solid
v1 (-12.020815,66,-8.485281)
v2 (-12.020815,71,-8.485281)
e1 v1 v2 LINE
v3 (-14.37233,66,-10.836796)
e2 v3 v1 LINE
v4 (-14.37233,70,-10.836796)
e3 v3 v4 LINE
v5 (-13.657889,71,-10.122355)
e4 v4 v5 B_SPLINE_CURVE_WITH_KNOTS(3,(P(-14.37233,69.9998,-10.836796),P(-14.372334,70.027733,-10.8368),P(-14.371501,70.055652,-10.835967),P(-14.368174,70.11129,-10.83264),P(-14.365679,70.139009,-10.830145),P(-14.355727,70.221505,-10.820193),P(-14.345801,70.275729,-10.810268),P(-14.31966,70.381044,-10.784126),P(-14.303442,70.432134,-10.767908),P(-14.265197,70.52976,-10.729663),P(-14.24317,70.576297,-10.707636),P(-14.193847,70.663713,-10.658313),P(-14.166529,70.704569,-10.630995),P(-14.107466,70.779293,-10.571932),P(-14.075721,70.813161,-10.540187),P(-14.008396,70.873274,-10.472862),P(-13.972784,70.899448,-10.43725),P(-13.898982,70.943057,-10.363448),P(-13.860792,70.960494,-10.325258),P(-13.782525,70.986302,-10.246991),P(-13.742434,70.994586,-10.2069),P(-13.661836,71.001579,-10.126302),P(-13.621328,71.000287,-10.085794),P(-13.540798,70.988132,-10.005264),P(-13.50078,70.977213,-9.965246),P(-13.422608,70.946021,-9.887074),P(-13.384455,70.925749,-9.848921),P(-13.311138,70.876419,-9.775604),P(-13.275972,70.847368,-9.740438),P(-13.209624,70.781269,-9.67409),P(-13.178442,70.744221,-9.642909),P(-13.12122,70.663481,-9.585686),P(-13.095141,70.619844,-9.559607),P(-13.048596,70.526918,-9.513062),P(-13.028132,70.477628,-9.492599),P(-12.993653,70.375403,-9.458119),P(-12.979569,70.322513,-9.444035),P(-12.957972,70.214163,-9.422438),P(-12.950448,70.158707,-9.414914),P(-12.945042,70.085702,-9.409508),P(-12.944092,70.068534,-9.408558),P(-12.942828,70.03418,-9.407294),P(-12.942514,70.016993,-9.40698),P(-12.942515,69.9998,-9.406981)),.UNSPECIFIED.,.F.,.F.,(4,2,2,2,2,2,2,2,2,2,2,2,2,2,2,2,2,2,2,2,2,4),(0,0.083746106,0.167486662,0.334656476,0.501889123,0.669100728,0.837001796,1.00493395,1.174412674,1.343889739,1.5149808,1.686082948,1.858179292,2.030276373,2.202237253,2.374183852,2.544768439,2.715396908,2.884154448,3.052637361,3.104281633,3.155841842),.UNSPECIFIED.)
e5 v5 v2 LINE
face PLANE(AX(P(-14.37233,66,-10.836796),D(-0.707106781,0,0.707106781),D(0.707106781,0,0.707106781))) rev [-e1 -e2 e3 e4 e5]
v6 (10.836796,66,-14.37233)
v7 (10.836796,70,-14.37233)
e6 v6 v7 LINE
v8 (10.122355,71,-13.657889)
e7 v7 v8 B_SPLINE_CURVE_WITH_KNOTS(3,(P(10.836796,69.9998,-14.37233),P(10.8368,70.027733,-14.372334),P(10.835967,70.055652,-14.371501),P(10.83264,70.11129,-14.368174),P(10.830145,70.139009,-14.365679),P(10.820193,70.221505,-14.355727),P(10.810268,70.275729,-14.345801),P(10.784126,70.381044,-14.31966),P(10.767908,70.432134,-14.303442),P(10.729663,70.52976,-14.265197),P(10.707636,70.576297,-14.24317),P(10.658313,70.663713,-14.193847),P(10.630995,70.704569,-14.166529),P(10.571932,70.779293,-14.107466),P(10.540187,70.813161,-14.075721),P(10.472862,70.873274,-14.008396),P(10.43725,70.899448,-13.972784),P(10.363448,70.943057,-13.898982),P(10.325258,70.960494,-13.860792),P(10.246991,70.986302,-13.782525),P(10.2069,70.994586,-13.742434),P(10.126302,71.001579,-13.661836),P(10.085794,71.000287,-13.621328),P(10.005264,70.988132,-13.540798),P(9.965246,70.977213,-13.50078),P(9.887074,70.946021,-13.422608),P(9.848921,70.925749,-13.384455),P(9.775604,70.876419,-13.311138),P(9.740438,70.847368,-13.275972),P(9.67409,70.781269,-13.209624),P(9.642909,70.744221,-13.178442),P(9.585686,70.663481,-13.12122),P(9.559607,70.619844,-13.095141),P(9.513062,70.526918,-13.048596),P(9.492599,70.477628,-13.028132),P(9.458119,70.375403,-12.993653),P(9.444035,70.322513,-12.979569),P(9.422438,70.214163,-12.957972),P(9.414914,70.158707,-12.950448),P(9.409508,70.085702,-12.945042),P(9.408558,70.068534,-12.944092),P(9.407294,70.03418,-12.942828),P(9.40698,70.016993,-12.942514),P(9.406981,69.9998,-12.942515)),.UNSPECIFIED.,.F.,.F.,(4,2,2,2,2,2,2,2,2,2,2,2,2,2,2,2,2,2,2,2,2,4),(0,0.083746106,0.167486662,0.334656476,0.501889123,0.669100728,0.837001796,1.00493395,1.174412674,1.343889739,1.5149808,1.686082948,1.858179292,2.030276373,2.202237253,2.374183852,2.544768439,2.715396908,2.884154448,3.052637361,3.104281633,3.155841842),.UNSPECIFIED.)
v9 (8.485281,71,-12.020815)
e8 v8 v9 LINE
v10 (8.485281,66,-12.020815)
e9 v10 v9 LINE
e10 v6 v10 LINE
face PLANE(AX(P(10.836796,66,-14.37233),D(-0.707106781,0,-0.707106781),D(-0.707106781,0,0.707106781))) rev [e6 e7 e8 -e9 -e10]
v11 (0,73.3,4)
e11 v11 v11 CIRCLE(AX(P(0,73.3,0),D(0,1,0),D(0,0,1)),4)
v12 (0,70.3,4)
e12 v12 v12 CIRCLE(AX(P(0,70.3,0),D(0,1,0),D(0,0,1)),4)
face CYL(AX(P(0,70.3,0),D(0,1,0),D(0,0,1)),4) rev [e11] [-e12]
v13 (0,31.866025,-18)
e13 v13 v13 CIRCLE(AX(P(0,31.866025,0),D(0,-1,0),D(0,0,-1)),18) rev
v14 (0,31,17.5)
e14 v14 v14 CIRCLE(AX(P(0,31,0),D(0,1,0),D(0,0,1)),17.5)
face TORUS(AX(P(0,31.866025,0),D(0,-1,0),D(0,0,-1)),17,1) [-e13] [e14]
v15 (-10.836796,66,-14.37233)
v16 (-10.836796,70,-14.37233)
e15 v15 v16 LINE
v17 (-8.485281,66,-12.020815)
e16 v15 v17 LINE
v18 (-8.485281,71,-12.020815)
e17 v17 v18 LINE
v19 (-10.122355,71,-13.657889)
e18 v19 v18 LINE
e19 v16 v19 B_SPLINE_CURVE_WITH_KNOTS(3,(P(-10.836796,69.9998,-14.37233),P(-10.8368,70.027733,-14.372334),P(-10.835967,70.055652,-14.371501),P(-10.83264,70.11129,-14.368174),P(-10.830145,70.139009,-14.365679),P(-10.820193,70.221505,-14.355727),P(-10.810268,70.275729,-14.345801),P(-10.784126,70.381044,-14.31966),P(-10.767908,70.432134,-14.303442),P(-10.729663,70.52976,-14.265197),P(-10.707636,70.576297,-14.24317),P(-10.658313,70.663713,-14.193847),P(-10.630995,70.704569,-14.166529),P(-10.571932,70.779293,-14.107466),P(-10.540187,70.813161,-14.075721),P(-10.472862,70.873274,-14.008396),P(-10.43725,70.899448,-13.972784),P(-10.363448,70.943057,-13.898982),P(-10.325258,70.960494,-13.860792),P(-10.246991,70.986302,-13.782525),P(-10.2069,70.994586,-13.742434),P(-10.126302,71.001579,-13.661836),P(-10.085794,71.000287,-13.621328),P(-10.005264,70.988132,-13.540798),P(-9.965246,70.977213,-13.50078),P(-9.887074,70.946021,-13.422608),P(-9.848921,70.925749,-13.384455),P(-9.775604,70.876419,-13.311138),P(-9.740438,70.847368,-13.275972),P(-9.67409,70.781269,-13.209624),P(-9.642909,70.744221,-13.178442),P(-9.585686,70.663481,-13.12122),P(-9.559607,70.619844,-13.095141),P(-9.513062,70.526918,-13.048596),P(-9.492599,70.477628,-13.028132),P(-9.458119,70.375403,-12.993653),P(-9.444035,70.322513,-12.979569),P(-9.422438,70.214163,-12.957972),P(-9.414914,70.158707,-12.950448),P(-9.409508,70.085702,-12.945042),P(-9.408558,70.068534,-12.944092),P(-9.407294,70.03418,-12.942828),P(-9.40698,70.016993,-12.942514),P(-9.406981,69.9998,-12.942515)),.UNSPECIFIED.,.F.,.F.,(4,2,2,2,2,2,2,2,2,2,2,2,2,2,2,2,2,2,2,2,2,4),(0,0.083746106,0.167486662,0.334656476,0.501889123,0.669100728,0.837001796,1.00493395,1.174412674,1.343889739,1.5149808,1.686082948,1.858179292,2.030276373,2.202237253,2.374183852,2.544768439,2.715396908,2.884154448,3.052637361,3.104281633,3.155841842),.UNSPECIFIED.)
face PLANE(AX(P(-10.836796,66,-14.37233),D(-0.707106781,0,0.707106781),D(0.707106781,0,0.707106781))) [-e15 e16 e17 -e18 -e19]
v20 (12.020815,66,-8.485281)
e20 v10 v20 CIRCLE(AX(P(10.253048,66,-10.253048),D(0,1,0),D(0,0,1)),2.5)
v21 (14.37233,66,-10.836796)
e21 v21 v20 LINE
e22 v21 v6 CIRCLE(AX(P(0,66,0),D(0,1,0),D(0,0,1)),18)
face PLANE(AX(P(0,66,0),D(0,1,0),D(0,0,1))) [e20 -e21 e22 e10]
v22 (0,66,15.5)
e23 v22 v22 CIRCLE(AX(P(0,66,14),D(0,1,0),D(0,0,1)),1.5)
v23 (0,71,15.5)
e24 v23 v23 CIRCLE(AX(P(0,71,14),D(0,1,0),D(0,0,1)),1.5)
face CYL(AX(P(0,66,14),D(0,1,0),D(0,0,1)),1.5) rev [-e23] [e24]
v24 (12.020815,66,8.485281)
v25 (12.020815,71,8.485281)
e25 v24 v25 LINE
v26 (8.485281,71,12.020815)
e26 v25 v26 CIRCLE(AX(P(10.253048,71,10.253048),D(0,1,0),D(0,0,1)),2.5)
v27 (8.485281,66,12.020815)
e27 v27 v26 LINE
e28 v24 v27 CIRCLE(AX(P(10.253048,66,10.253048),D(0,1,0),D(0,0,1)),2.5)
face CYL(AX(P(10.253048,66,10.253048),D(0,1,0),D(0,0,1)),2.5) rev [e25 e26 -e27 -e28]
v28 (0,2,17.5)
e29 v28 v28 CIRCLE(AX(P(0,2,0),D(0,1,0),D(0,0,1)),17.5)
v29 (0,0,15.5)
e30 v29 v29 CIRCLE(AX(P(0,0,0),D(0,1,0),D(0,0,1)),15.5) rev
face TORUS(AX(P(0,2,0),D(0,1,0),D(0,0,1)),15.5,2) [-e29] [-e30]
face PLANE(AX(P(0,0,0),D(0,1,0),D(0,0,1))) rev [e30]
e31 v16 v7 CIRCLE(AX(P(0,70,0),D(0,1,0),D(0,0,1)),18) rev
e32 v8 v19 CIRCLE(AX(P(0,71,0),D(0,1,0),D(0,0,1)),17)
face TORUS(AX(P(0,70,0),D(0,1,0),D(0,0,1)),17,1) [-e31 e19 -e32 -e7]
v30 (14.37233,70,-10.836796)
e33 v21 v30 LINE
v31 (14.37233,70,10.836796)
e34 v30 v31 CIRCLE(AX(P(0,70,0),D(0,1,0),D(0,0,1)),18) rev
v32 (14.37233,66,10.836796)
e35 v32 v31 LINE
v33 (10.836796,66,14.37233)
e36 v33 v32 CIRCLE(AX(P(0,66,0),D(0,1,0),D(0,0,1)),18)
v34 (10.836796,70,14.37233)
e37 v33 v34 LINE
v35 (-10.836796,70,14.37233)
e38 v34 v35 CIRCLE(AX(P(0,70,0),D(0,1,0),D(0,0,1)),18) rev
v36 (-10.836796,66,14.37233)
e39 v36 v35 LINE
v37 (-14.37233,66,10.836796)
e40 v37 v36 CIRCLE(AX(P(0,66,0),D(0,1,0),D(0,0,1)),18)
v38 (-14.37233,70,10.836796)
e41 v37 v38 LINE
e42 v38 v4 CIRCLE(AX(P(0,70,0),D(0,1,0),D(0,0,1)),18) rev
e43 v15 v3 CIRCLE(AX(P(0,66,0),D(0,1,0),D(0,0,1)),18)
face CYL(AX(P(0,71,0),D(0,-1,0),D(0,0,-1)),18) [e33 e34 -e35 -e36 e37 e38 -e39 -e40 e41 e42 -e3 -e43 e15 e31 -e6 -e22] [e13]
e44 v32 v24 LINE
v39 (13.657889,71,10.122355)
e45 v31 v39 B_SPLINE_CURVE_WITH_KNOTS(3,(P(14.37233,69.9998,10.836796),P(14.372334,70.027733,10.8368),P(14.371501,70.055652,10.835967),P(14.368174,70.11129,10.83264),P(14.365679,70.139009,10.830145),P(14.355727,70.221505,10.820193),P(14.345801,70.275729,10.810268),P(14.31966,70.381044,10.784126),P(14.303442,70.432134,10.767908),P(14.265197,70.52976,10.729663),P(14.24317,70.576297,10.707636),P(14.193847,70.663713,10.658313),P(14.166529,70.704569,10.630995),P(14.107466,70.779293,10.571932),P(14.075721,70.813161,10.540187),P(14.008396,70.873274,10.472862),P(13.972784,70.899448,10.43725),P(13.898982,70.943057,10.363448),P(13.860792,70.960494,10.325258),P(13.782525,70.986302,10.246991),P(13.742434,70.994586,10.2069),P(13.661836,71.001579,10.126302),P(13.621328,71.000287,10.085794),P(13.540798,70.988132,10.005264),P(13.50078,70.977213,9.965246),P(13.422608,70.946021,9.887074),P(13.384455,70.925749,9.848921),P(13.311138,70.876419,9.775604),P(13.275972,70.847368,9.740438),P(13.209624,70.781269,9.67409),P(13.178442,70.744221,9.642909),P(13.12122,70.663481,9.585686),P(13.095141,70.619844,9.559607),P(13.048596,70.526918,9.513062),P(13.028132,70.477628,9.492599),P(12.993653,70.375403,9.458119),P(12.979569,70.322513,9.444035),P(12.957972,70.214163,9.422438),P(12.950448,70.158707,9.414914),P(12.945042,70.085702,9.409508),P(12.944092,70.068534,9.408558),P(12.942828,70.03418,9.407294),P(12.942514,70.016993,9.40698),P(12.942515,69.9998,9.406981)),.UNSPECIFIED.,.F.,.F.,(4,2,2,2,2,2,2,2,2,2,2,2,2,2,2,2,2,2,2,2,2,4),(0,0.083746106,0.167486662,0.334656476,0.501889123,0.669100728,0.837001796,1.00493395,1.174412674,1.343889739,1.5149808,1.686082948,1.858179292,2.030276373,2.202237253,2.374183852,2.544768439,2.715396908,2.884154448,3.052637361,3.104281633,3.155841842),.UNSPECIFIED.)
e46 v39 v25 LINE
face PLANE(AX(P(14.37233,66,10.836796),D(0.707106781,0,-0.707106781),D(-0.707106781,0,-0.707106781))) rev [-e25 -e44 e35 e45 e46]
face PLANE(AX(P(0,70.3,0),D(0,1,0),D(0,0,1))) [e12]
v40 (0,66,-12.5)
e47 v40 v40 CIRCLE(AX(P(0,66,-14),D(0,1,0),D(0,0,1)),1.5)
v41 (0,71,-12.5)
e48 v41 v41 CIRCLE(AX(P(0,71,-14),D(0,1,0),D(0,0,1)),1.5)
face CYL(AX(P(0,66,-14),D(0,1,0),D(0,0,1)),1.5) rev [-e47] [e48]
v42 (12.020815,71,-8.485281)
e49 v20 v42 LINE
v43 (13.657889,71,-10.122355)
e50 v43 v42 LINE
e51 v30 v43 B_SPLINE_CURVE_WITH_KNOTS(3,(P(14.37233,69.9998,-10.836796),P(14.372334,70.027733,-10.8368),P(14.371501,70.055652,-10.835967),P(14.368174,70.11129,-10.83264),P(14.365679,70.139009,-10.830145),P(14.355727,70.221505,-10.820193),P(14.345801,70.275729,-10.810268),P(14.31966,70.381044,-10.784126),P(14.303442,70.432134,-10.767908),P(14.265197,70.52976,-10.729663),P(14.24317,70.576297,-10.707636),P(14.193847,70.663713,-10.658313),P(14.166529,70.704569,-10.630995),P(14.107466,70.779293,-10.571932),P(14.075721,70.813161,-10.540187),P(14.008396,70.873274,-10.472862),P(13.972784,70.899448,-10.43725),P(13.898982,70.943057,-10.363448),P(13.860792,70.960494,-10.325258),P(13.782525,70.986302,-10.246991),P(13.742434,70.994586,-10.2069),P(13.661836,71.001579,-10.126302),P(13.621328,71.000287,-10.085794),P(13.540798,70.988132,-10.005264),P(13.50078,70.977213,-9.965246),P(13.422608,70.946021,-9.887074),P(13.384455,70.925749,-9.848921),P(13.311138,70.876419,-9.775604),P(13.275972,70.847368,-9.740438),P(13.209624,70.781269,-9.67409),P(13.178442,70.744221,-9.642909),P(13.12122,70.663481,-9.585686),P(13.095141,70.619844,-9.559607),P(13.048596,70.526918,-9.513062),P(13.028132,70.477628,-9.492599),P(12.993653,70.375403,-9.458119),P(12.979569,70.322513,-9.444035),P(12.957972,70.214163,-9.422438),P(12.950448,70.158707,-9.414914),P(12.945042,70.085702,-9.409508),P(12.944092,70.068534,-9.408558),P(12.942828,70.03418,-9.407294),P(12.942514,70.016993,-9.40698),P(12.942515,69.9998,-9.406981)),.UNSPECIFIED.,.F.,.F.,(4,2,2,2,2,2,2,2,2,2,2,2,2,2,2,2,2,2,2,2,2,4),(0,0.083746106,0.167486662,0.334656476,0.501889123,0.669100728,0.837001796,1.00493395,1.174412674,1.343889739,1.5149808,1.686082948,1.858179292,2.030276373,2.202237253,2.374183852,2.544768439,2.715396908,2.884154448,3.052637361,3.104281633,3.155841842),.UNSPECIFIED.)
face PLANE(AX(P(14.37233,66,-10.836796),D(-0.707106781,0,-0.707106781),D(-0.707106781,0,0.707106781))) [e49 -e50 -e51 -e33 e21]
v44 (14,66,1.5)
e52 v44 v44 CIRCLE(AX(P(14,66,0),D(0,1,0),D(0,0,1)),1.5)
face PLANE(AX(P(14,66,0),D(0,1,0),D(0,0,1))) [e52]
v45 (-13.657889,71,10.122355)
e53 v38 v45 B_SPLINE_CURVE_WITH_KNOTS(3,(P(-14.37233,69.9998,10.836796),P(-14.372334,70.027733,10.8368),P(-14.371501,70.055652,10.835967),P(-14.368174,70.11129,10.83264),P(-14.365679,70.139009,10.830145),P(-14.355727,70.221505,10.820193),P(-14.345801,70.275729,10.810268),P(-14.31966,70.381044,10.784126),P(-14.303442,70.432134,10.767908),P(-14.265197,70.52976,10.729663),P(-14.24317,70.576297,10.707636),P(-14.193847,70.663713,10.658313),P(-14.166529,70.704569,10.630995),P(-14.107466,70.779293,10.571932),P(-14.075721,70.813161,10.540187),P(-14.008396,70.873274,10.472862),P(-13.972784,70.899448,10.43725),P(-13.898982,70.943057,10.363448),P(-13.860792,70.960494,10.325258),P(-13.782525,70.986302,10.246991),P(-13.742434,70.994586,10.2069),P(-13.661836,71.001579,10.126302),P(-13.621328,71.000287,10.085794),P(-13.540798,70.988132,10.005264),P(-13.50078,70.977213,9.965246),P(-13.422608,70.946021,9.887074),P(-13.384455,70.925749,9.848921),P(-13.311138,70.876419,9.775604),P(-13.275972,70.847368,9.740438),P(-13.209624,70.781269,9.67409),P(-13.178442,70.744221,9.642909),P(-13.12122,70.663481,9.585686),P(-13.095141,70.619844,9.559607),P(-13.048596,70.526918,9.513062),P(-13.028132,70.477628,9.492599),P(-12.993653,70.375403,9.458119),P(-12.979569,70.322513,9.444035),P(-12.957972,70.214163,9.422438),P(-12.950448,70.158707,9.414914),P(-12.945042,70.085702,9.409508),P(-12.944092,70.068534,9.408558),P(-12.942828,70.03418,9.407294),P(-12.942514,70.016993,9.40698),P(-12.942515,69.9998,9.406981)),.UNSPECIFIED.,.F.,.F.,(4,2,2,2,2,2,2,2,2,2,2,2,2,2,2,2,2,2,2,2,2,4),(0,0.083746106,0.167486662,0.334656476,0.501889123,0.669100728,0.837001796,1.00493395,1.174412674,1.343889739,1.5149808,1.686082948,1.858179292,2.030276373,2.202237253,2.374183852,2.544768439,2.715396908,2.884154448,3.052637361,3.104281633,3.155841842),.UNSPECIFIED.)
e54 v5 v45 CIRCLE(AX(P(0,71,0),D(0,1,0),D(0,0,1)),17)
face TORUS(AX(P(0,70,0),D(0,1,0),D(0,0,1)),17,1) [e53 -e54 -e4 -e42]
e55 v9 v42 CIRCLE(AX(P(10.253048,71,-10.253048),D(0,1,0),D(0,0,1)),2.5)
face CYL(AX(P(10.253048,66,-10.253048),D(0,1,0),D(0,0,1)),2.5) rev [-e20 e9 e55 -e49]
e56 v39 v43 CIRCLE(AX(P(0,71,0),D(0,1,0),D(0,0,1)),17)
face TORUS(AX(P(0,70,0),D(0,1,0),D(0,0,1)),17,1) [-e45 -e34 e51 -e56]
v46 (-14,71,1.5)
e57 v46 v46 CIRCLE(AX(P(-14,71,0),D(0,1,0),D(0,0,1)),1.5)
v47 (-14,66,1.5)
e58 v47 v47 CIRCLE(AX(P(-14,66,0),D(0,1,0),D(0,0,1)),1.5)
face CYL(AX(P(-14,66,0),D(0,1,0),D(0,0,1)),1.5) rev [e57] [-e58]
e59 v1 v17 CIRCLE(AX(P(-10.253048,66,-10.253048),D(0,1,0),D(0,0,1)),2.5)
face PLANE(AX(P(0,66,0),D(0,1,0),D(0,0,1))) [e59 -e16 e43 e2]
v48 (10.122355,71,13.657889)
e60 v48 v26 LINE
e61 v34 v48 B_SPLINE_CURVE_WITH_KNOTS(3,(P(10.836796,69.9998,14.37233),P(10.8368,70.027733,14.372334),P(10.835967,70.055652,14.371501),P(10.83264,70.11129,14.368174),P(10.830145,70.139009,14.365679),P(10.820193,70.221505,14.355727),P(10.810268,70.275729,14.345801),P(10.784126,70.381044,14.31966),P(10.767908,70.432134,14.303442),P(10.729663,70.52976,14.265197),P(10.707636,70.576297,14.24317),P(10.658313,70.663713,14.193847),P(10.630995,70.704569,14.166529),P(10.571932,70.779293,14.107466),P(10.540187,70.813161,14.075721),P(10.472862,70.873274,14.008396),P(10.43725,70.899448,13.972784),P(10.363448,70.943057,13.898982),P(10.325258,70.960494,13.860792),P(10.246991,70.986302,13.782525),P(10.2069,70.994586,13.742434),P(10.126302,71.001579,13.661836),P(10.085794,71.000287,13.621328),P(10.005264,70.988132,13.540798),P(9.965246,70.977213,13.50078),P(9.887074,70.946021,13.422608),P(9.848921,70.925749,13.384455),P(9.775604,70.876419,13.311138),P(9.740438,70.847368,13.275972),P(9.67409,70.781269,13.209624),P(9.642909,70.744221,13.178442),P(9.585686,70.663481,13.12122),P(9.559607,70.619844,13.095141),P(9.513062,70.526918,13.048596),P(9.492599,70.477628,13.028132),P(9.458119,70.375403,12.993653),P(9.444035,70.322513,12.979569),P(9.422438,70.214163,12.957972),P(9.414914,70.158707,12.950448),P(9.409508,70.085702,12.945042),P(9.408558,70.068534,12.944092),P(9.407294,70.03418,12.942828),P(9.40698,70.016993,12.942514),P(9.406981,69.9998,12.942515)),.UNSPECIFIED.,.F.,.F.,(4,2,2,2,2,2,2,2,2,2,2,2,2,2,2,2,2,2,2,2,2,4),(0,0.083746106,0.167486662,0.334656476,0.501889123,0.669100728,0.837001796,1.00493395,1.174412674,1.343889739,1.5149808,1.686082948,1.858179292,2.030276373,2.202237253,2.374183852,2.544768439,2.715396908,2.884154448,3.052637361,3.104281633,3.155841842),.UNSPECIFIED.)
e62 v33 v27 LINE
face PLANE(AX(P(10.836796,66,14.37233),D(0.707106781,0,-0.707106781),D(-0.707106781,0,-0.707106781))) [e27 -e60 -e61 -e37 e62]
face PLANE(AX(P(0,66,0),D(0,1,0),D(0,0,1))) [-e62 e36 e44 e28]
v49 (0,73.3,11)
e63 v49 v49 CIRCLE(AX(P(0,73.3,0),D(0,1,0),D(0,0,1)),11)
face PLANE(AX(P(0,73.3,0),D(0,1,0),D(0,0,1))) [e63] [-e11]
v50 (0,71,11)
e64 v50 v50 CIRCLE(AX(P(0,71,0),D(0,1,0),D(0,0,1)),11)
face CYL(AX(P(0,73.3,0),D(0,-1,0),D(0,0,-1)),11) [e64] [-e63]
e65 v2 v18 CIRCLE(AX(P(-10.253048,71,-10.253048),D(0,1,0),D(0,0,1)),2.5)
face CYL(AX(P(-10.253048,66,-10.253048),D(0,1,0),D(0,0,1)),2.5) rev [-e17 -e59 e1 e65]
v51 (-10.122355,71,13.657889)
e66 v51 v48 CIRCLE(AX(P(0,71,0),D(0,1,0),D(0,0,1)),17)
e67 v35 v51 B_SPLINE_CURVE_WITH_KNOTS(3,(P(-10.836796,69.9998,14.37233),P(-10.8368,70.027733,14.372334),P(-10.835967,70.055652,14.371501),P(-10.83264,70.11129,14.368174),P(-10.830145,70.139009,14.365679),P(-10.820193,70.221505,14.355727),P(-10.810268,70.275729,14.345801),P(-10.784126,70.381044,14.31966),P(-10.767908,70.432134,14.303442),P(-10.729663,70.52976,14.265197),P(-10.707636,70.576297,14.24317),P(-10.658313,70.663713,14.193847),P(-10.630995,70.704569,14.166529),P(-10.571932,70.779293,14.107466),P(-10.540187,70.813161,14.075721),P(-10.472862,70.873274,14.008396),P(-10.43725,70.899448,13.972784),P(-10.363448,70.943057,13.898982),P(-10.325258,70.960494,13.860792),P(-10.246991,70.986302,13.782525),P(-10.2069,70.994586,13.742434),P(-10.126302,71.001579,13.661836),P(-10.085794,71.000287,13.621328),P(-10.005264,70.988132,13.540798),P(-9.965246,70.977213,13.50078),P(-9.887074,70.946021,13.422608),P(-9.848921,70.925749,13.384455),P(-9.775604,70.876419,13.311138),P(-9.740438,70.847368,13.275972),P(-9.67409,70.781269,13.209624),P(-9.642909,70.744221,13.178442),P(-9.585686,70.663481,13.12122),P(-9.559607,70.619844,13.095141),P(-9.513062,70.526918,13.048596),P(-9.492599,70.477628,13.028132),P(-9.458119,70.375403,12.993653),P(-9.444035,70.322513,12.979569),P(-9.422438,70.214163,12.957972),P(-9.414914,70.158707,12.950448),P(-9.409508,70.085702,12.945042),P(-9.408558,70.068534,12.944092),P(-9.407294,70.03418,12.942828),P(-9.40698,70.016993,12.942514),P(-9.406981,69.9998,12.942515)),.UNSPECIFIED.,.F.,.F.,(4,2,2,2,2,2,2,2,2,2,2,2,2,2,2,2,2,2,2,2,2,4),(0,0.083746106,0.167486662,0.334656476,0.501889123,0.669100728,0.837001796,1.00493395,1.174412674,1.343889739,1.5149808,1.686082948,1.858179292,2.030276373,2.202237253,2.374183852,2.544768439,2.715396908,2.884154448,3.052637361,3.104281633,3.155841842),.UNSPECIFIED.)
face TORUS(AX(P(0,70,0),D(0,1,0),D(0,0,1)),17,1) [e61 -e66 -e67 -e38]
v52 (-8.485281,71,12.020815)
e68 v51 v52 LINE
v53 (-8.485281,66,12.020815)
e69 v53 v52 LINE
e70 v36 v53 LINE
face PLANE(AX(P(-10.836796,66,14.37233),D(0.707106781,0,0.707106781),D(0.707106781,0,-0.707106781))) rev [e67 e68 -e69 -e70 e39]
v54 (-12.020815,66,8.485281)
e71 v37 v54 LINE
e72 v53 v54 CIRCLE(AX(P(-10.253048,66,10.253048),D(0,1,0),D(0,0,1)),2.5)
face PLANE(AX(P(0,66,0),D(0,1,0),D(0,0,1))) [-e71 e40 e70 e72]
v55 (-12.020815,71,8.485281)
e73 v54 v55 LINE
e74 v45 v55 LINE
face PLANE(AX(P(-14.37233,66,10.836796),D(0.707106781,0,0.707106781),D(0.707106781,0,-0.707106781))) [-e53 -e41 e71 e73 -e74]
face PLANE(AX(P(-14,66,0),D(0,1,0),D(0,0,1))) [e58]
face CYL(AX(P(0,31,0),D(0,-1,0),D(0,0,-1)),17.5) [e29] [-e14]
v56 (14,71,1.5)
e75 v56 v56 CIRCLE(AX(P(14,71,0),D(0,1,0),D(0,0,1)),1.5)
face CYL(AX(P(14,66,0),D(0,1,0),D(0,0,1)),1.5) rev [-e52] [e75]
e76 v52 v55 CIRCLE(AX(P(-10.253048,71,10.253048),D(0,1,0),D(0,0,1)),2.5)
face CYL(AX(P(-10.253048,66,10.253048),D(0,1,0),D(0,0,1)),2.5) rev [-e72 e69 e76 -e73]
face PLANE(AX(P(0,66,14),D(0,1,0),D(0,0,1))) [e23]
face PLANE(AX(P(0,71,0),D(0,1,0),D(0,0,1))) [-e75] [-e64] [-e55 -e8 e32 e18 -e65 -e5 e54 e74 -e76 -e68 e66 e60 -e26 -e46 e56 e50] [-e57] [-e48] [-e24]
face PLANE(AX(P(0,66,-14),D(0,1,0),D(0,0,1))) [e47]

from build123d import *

# Parameters (mm, degrees)
SKETCH1_R           = 17.5
BOSS_EXTRUDE1_DEPTH = 31
SKETCH2_R           = 18
BOSS_EXTRUDE2_DEPTH = 40
FILLET1_R           = 2
FILLET2_R           = 1
SKETCH3_R           = 11
BOSS_EXTRUDE3_DEPTH = 2.3
SKETCH4_R           = 4
CUT_EXTRUDE1_DEPTH  = 3
SKETCH5_R           = 1.5
CUT_EXTRUDE2_DEPTH  = 5
FILLET3_R           = 1
CUT_EXTRUDE3_START  = -5
CUT_EXTRUDE3_DEPTH  = 5


with BuildPart() as part:
    # Sketch1 → Boss-Extrude1 (new body)
    with BuildSketch(Plane(origin=(0, 0, 0), x_dir=(1, 0, 0), z_dir=(0, 1, 0))):
        with Locations(Location((0, 0, 0), (0, 0, 270))):
            Circle(SKETCH1_R)
    extrude(amount=BOSS_EXTRUDE1_DEPTH)

    # Sketch2 → Boss-Extrude2 (add)
    with BuildSketch(Plane(origin=(0, 31, 0), x_dir=(1, 0, 0), z_dir=(0, 1, 0))):
        with Locations(Location((0, 0, 0), (0, 0, 270))):
            Circle(SKETCH2_R)
    extrude(amount=BOSS_EXTRUDE2_DEPTH)

    # Fillet1
    fillet1_edges = [part.edges().sort_by_distance(p)[0] for p in [
        (0, 0, -17.5),
    ]]
    fillet(fillet1_edges, radius=FILLET1_R)

    # Fillet2
    # the kernel refuses this fillet: 1 mm, written as the material it takes off along each edge
    with BuildSketch(Plane(origin=(0, 31, 0), x_dir=(0, 0, 1), z_dir=(-1, 0, 0))) as fillet2_piece_1:
        with BuildLine():
            CenterArc((17, 0.866025404), FILLET2_R, 300, 60)
            Line((18, 0.866025404), (18.02, 0.866025404))
            Line((18.02, 0.866025404), (18.02, 0))
            Line((18.02, 0), (18, -0.02))
            ThreePointArc((18, -0.02), (17.75, -0.02), (17.51, -0.017320508))
            Line((17.51, -0.017320508), (17.5, 0))
        make_face()
    revolve(axis=Axis((0, 31, 0), (0, 1, 0)), mode=Mode.SUBTRACT)

    # Sketch3 → Boss-Extrude3 (add)
    with BuildSketch(Plane(origin=(0, 71, 0), x_dir=(1, 0, 0), z_dir=(0, 1, 0))):
        with Locations(Location((0, 0, 0), (0, 0, 270))):
            Circle(SKETCH3_R)
    extrude(amount=BOSS_EXTRUDE3_DEPTH)

    # Sketch4 → Cut-Extrude1 (cut)
    with BuildSketch(Plane(origin=(0, 73.3, 0), x_dir=(1, 0, 0), z_dir=(0, 1, 0))):
        with Locations(Location((0, 0, 0), (0, 0, 270))):
            Circle(SKETCH4_R)
    extrude(amount=-CUT_EXTRUDE1_DEPTH, mode=Mode.SUBTRACT)

    # Sketch5 → Cut-Extrude2 (cut)
    with BuildSketch(Plane(origin=(0, 71, 0), x_dir=(1, 0, 0), z_dir=(0, 1, 0))):
        with Locations(Location((-14, 0, 0), (0, 0, 270))):
            Circle(SKETCH5_R)
        with Locations(Location((0, 14, 0), (0, 0, 270))):
            Circle(SKETCH5_R)
        with Locations(Location((14, 0, 0), (0, 0, 270))):
            Circle(SKETCH5_R)
        with Locations(Location((0, -14, 0), (0, 0, 270))):
            Circle(SKETCH5_R)
    extrude(amount=-CUT_EXTRUDE2_DEPTH, mode=Mode.SUBTRACT)

    # Fillet3
    fillet3_edges = [part.edges().sort_by_distance(p)[0] for p in [
        (0, 71, -18),
    ]]
    fillet(fillet3_edges, radius=FILLET3_R)

    # Sketch6 → Cut-Extrude3 (cut)
    with BuildSketch(Plane(origin=(0, 71, 0), x_dir=(1, 0, 0), z_dir=(0, 1, 0)).offset(CUT_EXTRUDE3_START)):
        with BuildLine():
            Line((-14.372329619, 10.836795713), (-12.02081528, 8.485281374))
            ThreePointArc((-12.02081528, 8.485281374), (-8.485281374, 8.485281374), (-8.485281374, 12.02081528))
            Line((-8.485281374, 12.02081528), (-10.836795713, 14.372329619))
            ThreePointArc((-10.836795713, 14.372329619), (-12.727922061, 12.727922061), (-14.372329619, 10.836795713))
        make_face()
        with BuildLine():
            Line((14.372329619, 10.836795713), (12.02081528, 8.485281374))
            ThreePointArc((12.02081528, 8.485281374), (8.485281374, 8.485281374), (8.485281374, 12.02081528))
            Line((8.485281374, 12.02081528), (10.836795713, 14.372329619))
            ThreePointArc((10.836795713, 14.372329619), (12.727922061, 12.727922061), (14.372329619, 10.836795713))
        make_face()
        with BuildLine():
            Line((10.836795713, -14.372329619), (8.485281374, -12.02081528))
            ThreePointArc((8.485281374, -12.02081528), (8.485281374, -8.485281374), (12.02081528, -8.485281374))
            Line((12.02081528, -8.485281374), (14.372329619, -10.836795713))
            ThreePointArc((14.372329619, -10.836795713), (12.727922061, -12.727922061), (10.836795713, -14.372329619))
        make_face()
        with BuildLine():
            Line((-14.372329619, -10.836795713), (-12.02081528, -8.485281374))
            ThreePointArc((-12.02081528, -8.485281374), (-8.485281374, -8.485281374), (-8.485281374, -12.02081528))
            Line((-8.485281374, -12.02081528), (-10.836795713, -14.372329619))
            ThreePointArc((-10.836795713, -14.372329619), (-12.727922061, -12.727922061), (-14.372329619, -10.836795713))
        make_face()
    extrude(amount=CUT_EXTRUDE3_DEPTH, mode=Mode.SUBTRACT)


solid = part.part
